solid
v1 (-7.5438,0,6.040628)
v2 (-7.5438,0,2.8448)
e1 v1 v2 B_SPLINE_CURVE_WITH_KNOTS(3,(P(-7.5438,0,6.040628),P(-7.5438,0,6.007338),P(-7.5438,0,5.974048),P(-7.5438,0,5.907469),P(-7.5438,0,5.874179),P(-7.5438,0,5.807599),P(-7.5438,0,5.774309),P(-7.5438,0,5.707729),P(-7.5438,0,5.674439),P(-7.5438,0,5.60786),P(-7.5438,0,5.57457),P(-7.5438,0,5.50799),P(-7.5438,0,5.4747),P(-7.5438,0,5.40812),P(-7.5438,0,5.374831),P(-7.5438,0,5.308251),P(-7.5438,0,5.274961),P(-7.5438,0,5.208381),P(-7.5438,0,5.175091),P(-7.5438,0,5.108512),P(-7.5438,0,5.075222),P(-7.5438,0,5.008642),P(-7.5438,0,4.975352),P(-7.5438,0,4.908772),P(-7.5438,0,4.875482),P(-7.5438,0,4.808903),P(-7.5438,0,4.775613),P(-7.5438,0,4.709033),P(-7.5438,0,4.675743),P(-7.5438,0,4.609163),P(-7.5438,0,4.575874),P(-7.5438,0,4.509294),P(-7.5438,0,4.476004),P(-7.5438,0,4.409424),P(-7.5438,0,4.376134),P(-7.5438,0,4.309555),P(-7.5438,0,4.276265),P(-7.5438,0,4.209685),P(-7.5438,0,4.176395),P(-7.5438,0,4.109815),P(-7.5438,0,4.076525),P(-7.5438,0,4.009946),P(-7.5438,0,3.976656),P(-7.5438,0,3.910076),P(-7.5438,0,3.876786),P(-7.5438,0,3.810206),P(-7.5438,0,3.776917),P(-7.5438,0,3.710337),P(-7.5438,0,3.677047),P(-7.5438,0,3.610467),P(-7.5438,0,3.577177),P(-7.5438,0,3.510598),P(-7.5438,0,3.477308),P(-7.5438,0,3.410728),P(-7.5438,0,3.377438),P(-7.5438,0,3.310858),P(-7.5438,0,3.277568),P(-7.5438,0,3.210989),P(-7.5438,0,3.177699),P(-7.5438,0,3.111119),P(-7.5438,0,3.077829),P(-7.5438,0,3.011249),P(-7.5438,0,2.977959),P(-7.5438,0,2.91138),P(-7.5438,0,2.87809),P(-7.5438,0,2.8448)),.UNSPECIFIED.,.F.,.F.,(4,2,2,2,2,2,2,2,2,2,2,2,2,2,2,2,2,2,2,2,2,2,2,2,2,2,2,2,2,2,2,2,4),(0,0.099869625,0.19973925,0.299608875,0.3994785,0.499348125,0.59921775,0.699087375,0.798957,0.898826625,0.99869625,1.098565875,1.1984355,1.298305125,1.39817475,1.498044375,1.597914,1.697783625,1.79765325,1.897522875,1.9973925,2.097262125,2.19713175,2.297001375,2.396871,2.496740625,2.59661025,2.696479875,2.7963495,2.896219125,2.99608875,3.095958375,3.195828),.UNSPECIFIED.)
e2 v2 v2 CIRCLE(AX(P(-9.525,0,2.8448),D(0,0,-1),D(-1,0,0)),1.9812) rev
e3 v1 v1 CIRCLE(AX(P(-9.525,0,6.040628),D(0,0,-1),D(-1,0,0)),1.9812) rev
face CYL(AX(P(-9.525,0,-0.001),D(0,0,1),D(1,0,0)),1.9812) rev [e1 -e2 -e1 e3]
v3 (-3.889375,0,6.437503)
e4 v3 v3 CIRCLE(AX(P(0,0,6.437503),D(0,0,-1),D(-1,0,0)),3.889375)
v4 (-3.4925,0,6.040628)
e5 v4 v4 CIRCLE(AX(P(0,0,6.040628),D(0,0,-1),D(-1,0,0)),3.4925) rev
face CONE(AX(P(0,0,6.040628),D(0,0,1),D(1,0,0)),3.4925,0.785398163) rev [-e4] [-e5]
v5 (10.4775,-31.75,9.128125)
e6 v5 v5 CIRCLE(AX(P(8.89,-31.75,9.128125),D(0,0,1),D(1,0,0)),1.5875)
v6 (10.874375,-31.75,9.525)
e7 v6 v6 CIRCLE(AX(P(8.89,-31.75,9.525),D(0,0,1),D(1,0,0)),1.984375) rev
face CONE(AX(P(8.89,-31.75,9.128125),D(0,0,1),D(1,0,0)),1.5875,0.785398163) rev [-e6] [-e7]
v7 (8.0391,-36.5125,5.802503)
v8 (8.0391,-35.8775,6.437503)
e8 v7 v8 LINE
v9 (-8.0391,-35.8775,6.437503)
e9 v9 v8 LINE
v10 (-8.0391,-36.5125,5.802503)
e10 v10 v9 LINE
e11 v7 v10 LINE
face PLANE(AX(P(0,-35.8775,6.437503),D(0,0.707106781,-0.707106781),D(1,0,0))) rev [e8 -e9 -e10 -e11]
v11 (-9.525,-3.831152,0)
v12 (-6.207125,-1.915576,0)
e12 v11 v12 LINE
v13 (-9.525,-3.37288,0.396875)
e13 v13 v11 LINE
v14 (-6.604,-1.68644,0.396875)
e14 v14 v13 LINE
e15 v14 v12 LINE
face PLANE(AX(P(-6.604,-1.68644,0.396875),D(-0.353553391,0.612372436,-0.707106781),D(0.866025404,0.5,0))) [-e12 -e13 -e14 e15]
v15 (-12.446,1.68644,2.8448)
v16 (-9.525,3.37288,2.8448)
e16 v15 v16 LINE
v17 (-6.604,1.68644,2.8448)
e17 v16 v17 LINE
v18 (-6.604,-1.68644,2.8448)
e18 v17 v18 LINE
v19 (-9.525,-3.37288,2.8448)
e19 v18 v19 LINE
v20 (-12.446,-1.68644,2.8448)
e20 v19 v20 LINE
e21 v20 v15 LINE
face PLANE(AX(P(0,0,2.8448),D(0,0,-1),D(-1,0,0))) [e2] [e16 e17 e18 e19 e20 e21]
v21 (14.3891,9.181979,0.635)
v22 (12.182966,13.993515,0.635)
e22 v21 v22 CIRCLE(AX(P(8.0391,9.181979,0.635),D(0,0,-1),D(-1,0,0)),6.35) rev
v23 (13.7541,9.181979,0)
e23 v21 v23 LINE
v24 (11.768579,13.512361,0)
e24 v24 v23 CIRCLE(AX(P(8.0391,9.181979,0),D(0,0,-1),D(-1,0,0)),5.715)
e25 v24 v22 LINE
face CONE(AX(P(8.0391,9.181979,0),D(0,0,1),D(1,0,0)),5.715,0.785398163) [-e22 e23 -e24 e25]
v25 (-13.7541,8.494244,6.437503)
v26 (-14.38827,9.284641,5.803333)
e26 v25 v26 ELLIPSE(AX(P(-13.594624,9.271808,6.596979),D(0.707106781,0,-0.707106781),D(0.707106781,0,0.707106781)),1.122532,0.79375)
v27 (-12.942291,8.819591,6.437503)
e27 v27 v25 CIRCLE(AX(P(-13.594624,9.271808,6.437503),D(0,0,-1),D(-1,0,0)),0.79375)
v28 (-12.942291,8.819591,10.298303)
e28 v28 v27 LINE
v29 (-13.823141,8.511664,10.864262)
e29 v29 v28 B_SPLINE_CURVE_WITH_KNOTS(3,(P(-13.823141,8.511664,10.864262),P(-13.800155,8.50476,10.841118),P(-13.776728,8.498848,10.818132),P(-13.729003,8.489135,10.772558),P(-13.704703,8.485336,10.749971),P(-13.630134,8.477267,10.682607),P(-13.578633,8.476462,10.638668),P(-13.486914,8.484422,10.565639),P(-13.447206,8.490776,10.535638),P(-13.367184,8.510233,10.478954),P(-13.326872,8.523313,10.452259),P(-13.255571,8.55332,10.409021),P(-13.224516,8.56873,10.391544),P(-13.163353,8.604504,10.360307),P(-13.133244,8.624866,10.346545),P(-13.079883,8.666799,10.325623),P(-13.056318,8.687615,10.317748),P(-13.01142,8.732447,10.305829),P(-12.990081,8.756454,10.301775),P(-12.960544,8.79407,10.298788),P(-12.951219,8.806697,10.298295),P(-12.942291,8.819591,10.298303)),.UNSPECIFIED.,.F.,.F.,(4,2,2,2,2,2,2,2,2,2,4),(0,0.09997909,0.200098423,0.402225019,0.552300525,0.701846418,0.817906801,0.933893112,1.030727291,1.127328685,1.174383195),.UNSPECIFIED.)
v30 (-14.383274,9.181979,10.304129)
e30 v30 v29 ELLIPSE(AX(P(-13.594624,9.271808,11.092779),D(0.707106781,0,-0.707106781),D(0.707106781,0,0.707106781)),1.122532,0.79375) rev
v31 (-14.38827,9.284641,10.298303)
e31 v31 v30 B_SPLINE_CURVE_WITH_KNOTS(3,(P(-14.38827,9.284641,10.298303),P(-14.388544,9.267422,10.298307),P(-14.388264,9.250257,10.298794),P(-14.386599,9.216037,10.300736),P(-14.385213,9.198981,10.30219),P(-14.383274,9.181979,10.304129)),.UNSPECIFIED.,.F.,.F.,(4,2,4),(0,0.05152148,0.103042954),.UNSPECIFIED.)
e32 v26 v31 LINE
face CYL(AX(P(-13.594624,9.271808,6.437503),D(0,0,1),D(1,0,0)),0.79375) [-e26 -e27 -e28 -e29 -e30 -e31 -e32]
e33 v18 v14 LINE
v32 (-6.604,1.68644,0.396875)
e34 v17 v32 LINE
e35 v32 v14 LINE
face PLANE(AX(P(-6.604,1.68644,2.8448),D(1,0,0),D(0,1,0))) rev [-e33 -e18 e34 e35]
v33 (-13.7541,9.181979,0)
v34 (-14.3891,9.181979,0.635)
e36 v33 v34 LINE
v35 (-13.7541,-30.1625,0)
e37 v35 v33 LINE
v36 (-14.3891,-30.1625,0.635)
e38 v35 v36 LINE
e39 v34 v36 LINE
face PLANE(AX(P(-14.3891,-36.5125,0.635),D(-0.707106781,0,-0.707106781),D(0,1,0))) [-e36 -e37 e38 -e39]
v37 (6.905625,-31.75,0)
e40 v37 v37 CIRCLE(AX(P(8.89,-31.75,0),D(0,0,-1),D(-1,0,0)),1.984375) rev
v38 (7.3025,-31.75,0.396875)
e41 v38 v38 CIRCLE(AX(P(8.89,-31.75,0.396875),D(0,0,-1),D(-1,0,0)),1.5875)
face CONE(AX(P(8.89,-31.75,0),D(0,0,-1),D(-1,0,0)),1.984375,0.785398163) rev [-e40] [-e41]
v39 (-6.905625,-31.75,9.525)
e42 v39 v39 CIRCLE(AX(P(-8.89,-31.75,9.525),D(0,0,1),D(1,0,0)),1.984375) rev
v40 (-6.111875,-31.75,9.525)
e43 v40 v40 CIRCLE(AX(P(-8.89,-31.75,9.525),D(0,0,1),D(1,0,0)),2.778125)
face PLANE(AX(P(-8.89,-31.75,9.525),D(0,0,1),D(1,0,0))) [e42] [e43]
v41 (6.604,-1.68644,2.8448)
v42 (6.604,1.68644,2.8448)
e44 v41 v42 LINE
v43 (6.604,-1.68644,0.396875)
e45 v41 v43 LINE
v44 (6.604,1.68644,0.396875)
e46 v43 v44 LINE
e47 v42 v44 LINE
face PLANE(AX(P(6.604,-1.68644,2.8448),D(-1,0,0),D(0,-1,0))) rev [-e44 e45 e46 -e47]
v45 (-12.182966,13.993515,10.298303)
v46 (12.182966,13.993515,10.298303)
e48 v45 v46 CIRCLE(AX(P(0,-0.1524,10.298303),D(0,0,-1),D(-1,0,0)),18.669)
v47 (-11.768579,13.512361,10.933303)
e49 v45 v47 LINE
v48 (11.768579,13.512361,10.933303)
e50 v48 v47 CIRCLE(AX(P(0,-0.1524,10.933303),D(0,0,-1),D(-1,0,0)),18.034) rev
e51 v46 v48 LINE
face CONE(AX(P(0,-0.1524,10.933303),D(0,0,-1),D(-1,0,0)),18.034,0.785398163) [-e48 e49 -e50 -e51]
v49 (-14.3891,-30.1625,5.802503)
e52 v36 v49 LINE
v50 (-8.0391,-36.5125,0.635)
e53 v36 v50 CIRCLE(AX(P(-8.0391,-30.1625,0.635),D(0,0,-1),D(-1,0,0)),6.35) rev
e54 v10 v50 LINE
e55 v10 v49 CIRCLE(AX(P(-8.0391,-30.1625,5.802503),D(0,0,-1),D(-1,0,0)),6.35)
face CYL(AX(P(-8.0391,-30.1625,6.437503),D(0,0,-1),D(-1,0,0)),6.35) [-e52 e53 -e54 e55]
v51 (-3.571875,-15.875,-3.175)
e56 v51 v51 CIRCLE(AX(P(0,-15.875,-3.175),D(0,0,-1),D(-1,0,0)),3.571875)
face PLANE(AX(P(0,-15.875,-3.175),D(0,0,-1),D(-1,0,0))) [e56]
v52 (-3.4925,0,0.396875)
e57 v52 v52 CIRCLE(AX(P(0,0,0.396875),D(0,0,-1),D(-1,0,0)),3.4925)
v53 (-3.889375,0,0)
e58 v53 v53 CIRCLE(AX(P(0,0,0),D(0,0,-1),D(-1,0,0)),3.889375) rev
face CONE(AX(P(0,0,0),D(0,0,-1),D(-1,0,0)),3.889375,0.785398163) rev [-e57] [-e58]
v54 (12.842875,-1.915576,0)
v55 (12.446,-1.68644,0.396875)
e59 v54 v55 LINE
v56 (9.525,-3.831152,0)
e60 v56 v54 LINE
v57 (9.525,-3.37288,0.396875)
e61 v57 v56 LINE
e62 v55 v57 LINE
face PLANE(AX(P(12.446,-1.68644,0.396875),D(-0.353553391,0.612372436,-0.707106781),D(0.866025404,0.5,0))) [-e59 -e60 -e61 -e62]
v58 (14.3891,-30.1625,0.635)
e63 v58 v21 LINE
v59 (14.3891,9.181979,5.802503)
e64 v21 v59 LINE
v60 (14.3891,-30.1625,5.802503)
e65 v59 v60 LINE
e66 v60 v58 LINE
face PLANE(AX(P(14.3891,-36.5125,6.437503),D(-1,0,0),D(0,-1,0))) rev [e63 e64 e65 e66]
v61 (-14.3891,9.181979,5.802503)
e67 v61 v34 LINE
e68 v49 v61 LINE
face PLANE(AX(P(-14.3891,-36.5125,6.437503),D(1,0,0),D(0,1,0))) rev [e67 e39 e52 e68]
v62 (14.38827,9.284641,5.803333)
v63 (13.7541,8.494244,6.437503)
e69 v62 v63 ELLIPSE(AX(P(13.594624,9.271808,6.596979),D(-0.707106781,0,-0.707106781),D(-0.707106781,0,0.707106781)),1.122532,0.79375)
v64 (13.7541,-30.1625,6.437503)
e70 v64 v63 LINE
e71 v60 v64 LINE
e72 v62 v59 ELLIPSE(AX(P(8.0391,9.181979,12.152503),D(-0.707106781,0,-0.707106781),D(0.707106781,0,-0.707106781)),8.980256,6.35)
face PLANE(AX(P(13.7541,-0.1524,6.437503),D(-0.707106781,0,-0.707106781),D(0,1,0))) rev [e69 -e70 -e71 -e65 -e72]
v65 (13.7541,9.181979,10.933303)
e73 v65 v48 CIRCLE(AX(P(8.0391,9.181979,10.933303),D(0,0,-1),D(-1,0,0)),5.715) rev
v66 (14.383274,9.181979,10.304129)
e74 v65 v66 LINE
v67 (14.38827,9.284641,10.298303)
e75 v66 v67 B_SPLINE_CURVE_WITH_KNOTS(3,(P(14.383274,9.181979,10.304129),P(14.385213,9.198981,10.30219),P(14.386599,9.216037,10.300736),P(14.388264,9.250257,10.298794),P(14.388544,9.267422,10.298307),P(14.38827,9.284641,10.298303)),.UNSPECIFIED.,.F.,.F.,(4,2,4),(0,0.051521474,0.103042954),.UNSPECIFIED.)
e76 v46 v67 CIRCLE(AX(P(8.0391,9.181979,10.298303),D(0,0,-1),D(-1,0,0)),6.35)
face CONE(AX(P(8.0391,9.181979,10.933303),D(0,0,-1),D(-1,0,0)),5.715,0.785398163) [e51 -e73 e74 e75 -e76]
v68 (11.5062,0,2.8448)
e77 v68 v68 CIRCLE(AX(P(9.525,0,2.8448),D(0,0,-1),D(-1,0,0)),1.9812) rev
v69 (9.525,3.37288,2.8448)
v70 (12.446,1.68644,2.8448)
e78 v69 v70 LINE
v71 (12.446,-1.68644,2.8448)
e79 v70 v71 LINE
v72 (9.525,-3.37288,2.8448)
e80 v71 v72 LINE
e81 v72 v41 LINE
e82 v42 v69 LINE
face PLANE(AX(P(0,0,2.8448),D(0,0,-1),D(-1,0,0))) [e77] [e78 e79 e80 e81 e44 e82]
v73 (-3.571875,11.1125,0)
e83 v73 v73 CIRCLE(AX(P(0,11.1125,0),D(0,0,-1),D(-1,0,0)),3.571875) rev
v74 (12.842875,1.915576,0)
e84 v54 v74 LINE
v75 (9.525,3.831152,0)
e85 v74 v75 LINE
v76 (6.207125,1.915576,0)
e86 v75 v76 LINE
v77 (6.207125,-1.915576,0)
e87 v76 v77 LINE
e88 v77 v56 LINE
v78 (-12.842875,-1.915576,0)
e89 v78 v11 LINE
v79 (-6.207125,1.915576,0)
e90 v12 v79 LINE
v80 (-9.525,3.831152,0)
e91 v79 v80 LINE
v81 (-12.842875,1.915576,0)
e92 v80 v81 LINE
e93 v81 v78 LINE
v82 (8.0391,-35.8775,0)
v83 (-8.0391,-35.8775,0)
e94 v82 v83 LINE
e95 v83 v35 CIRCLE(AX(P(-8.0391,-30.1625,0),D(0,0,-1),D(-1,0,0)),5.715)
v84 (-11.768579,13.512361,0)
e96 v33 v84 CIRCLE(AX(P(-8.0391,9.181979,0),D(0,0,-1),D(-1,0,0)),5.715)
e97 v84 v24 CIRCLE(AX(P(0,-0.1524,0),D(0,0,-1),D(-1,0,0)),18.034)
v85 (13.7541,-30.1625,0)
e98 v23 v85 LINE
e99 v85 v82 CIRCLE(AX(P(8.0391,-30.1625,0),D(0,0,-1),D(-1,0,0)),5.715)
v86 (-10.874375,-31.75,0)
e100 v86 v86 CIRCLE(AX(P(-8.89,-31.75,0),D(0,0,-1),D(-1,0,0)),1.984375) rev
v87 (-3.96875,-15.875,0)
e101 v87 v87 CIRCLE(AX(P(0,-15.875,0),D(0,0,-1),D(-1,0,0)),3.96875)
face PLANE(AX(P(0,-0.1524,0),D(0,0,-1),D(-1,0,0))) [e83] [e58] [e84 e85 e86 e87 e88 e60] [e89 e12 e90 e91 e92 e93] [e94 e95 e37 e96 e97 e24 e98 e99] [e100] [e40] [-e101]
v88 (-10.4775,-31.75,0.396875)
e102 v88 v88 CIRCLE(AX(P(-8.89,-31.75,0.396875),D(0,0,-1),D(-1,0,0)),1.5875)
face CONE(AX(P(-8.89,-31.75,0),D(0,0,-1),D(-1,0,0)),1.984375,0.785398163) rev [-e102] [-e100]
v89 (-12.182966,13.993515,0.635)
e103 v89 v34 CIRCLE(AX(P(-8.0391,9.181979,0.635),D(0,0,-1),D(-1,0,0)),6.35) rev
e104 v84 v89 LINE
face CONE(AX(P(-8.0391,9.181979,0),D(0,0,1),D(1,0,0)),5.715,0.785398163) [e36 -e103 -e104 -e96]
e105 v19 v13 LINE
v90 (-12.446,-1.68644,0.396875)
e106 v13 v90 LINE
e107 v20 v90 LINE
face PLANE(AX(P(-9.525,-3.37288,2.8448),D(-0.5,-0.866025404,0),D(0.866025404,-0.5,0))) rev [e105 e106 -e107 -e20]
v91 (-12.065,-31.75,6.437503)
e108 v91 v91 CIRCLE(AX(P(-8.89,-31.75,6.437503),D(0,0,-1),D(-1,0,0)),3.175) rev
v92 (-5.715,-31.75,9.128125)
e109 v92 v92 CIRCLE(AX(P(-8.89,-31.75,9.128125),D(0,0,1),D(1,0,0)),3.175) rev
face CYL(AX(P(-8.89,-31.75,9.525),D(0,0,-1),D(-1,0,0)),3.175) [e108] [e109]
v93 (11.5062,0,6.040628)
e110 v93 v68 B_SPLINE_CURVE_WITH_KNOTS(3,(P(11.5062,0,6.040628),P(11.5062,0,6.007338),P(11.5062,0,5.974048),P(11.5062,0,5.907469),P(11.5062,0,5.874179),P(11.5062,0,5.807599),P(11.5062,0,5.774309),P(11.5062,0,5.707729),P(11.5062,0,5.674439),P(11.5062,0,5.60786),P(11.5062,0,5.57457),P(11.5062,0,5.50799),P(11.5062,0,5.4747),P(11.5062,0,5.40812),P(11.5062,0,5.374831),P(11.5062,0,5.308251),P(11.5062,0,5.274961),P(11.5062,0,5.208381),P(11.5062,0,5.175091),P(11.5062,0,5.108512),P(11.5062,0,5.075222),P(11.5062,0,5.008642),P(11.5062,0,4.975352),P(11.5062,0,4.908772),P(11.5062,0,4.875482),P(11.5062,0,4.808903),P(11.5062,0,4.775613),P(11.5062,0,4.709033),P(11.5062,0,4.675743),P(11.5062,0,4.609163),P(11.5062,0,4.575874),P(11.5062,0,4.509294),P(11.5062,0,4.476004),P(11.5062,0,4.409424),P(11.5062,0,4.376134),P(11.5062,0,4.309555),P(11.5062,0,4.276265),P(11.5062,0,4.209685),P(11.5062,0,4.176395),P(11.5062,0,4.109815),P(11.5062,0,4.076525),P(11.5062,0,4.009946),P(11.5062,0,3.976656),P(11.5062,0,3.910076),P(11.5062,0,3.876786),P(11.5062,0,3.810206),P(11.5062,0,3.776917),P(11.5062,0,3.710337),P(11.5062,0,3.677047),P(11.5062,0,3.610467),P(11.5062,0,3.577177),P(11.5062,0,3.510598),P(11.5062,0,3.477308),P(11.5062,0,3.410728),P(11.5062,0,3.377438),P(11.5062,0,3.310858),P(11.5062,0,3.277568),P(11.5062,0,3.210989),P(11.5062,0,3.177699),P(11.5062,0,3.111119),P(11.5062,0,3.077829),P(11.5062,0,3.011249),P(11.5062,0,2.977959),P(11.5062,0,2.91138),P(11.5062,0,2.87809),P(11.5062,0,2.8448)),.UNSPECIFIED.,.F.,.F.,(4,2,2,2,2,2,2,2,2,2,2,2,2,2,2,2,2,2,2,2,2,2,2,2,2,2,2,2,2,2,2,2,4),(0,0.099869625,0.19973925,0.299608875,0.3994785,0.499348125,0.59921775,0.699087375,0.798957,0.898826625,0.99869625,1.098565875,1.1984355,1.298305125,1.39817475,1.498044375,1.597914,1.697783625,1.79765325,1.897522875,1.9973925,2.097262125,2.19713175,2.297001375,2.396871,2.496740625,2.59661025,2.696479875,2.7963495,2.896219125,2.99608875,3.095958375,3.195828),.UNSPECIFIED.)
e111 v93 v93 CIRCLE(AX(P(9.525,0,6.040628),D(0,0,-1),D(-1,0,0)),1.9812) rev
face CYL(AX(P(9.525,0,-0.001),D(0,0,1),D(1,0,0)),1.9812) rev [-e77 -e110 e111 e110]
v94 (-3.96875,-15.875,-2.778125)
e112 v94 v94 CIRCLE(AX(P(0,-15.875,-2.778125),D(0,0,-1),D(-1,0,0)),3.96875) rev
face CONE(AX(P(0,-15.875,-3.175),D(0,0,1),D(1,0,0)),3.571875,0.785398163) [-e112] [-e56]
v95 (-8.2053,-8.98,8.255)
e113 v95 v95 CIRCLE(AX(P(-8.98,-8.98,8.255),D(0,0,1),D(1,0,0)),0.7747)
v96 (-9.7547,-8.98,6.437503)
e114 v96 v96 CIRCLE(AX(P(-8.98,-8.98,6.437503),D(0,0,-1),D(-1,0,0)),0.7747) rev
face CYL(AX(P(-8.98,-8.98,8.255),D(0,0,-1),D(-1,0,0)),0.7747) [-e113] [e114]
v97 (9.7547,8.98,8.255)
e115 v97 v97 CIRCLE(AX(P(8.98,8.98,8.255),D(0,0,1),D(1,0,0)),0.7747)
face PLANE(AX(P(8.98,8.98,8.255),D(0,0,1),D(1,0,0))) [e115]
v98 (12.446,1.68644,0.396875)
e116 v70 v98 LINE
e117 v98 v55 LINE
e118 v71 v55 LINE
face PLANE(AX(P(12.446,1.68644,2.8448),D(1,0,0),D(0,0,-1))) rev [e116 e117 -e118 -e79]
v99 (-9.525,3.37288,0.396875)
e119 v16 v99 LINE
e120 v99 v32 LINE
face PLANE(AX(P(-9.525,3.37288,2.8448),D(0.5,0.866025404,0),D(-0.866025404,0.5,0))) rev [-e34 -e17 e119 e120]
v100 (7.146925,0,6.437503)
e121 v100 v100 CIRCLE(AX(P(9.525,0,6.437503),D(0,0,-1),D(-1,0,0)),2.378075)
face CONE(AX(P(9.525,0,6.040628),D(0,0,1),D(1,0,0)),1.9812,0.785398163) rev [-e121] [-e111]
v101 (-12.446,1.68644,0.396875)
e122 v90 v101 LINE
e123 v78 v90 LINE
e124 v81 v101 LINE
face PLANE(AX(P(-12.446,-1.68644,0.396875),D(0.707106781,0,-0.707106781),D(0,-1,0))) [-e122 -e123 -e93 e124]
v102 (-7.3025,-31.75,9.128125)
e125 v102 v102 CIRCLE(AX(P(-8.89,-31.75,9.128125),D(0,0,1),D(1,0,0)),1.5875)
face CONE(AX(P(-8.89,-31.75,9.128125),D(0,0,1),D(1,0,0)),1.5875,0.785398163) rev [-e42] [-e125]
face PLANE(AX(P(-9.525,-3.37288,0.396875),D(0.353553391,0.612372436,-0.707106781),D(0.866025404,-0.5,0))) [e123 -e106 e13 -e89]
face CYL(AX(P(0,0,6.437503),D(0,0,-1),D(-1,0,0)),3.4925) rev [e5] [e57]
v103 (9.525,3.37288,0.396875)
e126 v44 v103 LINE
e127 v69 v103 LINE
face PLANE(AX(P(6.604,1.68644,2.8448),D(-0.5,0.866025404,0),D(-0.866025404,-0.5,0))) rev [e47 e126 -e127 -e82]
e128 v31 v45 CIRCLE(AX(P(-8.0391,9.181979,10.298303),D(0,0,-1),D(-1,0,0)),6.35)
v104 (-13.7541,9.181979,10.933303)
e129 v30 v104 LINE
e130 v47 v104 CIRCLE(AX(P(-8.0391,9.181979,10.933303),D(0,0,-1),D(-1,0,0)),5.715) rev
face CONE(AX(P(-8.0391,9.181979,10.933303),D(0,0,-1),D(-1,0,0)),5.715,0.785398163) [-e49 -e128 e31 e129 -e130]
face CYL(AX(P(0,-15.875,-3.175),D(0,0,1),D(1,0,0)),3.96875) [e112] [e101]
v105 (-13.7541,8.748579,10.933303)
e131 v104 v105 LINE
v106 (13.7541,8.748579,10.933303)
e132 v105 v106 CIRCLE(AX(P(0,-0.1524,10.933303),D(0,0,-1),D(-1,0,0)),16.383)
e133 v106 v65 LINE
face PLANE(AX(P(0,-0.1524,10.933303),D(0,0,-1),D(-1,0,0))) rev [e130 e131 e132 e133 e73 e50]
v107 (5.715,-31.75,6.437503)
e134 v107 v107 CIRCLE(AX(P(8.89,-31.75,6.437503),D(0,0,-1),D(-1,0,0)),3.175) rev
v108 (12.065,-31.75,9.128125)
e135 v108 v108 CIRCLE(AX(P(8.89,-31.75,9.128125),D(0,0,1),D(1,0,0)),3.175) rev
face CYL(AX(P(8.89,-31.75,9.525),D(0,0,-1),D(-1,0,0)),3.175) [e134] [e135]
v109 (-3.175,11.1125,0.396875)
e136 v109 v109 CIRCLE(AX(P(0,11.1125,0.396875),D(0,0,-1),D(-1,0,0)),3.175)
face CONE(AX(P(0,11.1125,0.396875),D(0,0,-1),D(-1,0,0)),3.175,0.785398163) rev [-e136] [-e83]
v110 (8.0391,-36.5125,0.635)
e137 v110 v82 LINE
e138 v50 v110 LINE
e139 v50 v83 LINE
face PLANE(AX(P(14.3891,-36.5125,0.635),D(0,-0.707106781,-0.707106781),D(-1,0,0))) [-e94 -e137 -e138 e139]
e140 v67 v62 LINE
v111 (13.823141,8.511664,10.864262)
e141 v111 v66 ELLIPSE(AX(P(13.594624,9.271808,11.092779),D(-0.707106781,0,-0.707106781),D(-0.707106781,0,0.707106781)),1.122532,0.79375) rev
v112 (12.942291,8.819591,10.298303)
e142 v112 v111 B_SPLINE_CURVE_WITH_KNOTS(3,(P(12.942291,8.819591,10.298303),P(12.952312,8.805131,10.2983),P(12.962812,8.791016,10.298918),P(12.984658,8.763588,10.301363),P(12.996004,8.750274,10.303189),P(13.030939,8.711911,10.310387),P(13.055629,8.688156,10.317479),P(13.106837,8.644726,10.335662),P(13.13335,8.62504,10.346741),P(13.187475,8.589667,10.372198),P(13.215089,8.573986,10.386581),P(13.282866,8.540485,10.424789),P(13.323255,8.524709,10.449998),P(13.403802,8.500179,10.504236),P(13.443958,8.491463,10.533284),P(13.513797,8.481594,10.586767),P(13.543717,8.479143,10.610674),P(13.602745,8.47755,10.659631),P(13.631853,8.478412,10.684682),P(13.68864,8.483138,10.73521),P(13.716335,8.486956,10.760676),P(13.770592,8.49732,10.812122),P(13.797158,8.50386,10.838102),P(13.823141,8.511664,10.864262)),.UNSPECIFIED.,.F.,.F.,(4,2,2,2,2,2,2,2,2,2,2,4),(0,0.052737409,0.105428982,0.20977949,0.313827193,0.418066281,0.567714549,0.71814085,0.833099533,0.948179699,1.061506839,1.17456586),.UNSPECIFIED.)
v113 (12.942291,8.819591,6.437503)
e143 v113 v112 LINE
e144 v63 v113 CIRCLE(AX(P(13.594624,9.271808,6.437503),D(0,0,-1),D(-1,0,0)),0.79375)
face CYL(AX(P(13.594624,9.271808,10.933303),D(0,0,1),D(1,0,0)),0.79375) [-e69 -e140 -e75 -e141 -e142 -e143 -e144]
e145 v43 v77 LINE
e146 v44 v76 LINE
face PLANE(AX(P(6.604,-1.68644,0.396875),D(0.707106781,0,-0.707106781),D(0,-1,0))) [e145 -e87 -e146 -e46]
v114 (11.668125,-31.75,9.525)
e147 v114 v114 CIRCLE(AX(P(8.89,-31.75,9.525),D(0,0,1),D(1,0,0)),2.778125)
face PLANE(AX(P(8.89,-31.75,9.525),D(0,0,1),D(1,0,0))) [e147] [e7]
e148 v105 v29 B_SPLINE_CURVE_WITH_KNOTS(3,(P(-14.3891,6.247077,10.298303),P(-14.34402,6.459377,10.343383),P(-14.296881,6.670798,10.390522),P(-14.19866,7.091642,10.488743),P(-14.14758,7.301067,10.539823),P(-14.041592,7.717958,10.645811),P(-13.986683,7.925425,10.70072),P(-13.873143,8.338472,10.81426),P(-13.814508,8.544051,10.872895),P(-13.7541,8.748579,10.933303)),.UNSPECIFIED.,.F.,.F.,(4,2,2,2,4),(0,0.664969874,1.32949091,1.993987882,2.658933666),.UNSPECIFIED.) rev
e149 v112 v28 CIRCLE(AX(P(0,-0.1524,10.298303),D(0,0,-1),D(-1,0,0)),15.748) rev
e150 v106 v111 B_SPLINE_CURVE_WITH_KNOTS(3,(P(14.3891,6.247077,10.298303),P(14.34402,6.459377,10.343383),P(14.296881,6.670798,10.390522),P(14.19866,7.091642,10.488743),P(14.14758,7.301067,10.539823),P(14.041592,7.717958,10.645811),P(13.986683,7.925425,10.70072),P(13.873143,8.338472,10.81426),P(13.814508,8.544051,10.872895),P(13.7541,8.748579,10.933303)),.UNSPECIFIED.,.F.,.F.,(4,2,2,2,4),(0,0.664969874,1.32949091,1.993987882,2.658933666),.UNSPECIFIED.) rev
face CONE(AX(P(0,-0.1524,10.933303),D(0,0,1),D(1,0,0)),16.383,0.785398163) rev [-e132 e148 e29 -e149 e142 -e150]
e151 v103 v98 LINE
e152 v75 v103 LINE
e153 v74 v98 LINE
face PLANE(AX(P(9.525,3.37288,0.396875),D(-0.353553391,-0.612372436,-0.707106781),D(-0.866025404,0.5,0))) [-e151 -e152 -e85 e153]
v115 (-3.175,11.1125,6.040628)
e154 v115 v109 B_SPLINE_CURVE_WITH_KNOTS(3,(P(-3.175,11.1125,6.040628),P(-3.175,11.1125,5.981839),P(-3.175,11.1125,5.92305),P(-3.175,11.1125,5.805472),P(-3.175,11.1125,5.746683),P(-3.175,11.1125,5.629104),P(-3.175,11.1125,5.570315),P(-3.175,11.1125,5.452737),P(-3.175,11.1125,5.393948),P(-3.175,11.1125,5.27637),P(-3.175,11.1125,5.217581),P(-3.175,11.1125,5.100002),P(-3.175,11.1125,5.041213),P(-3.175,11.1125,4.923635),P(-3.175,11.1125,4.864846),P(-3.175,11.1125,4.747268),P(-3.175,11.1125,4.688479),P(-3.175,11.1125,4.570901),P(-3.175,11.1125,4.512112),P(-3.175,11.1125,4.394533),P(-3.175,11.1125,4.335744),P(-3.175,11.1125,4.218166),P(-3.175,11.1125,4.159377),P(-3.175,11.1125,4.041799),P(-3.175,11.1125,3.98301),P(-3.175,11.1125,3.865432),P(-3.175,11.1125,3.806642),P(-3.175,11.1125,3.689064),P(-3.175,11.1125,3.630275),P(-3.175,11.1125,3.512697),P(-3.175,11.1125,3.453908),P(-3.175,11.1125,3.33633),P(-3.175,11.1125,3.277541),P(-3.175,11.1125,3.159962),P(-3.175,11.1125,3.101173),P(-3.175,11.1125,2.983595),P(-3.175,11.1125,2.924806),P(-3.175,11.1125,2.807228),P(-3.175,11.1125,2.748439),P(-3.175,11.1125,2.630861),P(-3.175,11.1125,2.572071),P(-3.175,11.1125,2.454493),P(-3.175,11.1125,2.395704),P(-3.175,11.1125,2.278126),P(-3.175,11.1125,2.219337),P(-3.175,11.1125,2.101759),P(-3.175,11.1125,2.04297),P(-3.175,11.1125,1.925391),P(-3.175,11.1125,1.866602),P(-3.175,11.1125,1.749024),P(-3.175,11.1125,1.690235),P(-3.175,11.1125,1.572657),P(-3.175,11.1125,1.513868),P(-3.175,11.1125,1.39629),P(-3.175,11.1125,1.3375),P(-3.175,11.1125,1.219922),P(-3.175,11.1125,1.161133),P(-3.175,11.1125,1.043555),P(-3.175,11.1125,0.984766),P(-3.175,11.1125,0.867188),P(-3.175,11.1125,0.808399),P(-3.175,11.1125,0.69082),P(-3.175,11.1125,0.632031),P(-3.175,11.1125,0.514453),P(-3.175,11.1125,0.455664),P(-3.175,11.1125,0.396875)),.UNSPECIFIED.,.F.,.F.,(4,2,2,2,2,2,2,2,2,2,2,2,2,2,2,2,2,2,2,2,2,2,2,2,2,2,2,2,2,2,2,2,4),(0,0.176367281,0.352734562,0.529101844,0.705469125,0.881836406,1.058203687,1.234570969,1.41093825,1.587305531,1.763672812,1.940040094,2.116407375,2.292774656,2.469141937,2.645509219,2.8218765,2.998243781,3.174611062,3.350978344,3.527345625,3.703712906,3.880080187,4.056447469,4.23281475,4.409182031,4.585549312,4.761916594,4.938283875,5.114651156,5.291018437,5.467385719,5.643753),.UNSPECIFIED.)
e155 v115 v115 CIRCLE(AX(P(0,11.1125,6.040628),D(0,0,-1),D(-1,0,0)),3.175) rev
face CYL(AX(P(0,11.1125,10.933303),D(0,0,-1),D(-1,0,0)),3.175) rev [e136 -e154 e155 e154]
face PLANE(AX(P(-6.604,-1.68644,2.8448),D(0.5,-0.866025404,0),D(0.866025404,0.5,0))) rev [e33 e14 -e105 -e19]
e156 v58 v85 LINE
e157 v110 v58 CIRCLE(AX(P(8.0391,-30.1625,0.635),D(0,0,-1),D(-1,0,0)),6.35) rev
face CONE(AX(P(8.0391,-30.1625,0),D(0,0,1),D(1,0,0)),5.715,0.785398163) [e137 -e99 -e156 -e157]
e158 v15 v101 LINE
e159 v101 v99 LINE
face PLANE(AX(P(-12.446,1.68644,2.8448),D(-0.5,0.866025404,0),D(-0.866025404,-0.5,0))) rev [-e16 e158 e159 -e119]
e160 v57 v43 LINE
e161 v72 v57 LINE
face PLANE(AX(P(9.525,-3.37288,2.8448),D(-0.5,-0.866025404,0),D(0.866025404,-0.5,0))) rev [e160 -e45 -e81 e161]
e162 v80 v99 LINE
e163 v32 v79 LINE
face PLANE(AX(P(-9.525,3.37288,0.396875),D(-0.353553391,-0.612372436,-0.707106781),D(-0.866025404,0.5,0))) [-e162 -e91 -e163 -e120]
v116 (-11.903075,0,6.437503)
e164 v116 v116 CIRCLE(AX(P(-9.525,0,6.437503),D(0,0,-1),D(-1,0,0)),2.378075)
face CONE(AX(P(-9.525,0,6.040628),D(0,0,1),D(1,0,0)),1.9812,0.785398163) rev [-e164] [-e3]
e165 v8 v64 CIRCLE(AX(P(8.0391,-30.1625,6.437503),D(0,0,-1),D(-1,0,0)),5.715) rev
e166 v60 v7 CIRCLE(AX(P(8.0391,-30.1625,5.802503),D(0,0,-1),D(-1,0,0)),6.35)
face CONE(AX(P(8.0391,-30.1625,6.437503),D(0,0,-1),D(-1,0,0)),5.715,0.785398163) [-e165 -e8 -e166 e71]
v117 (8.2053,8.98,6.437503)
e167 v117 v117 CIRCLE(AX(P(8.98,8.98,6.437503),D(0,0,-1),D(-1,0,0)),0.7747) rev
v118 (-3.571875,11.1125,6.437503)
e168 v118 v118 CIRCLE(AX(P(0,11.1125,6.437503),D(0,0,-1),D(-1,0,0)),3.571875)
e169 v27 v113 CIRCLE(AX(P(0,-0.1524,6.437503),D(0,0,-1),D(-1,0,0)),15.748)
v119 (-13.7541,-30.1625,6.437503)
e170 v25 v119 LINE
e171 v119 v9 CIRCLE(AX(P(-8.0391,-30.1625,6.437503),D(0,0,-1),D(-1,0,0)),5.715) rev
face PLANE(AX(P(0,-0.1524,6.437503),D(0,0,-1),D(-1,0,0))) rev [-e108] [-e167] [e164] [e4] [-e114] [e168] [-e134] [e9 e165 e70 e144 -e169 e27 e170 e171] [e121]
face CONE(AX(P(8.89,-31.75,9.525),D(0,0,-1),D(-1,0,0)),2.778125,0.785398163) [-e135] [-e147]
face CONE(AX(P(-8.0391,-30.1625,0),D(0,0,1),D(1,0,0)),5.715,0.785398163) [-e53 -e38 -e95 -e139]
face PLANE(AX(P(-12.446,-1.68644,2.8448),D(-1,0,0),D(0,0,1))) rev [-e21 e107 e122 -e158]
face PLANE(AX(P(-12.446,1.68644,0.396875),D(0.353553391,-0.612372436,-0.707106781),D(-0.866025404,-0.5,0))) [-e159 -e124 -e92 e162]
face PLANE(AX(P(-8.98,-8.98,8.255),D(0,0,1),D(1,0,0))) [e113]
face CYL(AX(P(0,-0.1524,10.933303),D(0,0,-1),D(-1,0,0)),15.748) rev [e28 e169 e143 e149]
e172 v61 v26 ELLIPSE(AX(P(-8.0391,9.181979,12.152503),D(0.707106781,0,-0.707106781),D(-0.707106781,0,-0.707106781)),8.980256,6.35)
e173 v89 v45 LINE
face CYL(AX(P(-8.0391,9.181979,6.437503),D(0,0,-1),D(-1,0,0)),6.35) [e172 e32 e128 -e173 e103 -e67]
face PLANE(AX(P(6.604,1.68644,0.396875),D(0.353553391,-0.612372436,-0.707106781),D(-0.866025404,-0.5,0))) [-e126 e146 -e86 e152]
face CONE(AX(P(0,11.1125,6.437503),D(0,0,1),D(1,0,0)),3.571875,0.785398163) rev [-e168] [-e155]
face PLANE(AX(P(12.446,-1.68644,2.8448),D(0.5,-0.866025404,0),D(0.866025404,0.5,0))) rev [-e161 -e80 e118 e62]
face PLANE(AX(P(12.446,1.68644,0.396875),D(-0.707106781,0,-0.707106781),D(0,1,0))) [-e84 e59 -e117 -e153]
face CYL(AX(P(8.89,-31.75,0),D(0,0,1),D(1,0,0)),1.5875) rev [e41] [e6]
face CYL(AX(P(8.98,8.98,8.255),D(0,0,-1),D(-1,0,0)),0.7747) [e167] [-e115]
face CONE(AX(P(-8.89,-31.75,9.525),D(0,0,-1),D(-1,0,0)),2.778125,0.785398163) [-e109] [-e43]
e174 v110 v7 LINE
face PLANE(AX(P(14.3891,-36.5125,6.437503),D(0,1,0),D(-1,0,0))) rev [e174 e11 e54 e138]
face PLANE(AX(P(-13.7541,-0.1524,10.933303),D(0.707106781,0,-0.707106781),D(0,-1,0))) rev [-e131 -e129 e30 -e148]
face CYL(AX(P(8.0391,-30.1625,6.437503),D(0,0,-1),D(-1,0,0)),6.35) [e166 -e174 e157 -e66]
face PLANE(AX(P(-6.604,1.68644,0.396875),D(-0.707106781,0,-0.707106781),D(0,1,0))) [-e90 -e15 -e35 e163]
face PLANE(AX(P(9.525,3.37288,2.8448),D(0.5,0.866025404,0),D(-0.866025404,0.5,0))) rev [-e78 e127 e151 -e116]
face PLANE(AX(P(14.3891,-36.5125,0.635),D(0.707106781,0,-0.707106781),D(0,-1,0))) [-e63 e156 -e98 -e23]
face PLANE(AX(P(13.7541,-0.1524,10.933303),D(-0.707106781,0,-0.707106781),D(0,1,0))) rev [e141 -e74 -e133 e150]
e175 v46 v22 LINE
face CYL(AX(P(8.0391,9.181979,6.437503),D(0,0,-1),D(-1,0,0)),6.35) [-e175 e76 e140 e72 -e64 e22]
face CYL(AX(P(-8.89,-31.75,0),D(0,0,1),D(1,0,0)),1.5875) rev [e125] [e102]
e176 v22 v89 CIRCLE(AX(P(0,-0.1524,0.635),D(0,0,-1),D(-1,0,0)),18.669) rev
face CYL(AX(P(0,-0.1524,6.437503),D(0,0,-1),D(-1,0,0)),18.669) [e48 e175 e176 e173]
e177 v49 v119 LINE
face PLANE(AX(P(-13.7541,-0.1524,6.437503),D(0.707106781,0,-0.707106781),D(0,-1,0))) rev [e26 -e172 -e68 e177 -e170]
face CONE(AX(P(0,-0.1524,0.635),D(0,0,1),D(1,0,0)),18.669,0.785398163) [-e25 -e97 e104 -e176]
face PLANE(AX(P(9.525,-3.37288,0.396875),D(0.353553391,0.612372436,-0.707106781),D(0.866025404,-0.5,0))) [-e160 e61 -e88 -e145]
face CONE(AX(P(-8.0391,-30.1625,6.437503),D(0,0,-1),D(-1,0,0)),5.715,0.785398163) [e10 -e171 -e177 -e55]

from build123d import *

# Parameters (mm, degrees)
SKETCH2_R           = 3.4925
BOSS_EXTRUDE1_DEPTH = 6.437503
BOSS_EXTRUDE5_DEPTH = 4.4958
CUT_EXTRUDE7_REACH  = 41.77
SKETCH17_R          = 1.9812
SKETCH13_R          = 1.5875
CUT_EXTRUDE5_DEPTH  = 40.769967311
SKETCH7_R           = 3.96875
BOSS_EXTRUDE4_DEPTH = 3.175
SKETCH14_R          = 3.175
CUT_EXTRUDE6_DEPTH  = 41.73997999
BOSS_EXTRUDE7_START = 3.087497
SKETCH15_R          = 3.175
SKETCH15_R_2        = 1.5875
BOSS_EXTRUDE7_DEPTH = 3.087497
SKETCH16_R          = 0.7747
BOSS_EXTRUDE8_DEPTH = 8.255
CUT_EXTRUDE8_DEPTH  = 2.8448
CHAMFER1_SIZE       = 0.396875
FILLET1_R           = 6.35
CHAMFER2_SIZE       = 0.635
FILLET2_R           = 0.79375


with BuildPart() as part:
    # Sketch2 → Boss-Extrude1 (new body)
    with BuildSketch(Plane.XY):
        with BuildLine():
            Line((14.3891, -36.5125), (-14.3891, -36.5125))
            Line((-14.3891, -36.5125), (-14.3891, 11.742361964))
            ThreePointArc((-14.3891, 11.742361964), (0, 18.5166), (14.3891, 11.742361964))
            Line((14.3891, 11.742361964), (14.3891, -36.5125))
        make_face()
        Circle(SKETCH2_R, mode=Mode.SUBTRACT)
    extrude(amount=BOSS_EXTRUDE1_DEPTH)

    # Sketch12 → Boss-Extrude5 (add)
    with BuildSketch(Plane.XY.offset(6.437503)):
        with BuildLine():
            Line((-14.3891, 6.247076947), (-14.3891, 11.742361964))
            ThreePointArc((-14.3891, 11.742361964), (0, 18.5166), (14.3891, 11.742361964))
            Line((14.3891, 11.742361964), (14.3891, 6.247076947))
            ThreePointArc((14.3891, 6.247076947), (0, 15.5956), (-14.3891, 6.247076947))
        make_face()
    extrude(amount=BOSS_EXTRUDE5_DEPTH)

    # Sketch17 → Cut-Extrude7 (cut, up to next)
    with BuildSketch(Plane.XY.offset(6.437503), mode=Mode.PRIVATE) as cut_extrude7_sk1:
        with Locations((-9.525, 0)):
            Circle(SKETCH17_R)
    cut_extrude7_tool1 = extrude(cut_extrude7_sk1.sketch, amount=-CUT_EXTRUDE7_REACH, mode=Mode.PRIVATE) & part.part
    # Sketch17 → Cut-Extrude7 (cut, up to next)
    with BuildSketch(Plane.XY.offset(6.437503), mode=Mode.PRIVATE) as cut_extrude7_sk2:
        with Locations((9.525, 0)):
            Circle(SKETCH17_R)
    cut_extrude7_tool2 = extrude(cut_extrude7_sk2.sketch, amount=-CUT_EXTRUDE7_REACH, mode=Mode.PRIVATE) & part.part
    add(cut_extrude7_tool1.solids().sort_by_distance((-9.525, 0, 6.437503))[0], mode=Mode.SUBTRACT)
    add(cut_extrude7_tool2.solids().sort_by_distance((9.525, 0, 6.437503))[0], mode=Mode.SUBTRACT)

    # Sketch13 → Cut-Extrude5 (cut, through all)
    with BuildSketch(Plane.XY.offset(6.437503)):
        with Locations((8.89, -31.75)):
            Circle(SKETCH13_R)
        with Locations((-8.89, -31.75)):
            Circle(SKETCH13_R)
    extrude(amount=-CUT_EXTRUDE5_DEPTH, mode=Mode.SUBTRACT)

    # Sketch7 → Boss-Extrude4 (add)
    with BuildSketch(Plane(origin=(0, 0, 0), x_dir=(-1, 0, 0), z_dir=(0, 0, -1))):
        with Locations((0, -15.875)):
            Circle(SKETCH7_R)
    extrude(amount=BOSS_EXTRUDE4_DEPTH)

    # Sketch14 → Cut-Extrude6 (cut, through all)
    with BuildSketch(Plane(origin=(0, 0, 0), x_dir=(-1, 0, 0), z_dir=(0, 0, -1))):
        with Locations((0, 11.1125)):
            Circle(SKETCH14_R)
    extrude(amount=-CUT_EXTRUDE6_DEPTH, mode=Mode.SUBTRACT)

    # Sketch15 → Boss-Extrude7 (add)
    # profile 1 of 2: a face of its own
    with BuildSketch(Plane.XY.offset(6.437503).offset(BOSS_EXTRUDE7_START)):
        with Locations(Location((-8.89, -31.75, 0), (0, 0, 180))):
            Circle(SKETCH15_R)
        with Locations((-8.89, -31.75)):
            Circle(SKETCH15_R_2, mode=Mode.SUBTRACT)
    # profile 2 of 2: a face of its own
    with BuildSketch(Plane.XY.offset(6.437503).offset(BOSS_EXTRUDE7_START)):
        with Locations(Location((8.89, -31.75, 0), (0, 0, 180))):
            Circle(SKETCH15_R)
        with Locations((8.89, -31.75)):
            Circle(SKETCH15_R_2, mode=Mode.SUBTRACT)
    extrude(amount=-BOSS_EXTRUDE7_DEPTH)

    # Sketch16 → Boss-Extrude8 (add)
    with BuildSketch(Plane.XY):
        with Locations(Location((8.979999998, 8.979999998, 0), (0, 0, 180))):
            Circle(SKETCH16_R)
        with Locations(Location((-8.980000074, -8.980000074, 0), (0, 0, 180))):
            Circle(SKETCH16_R)
    extrude(amount=BOSS_EXTRUDE8_DEPTH)

    # Sketch11 → Cut-Extrude8 (cut)
    with BuildSketch(Plane(origin=(0, 0, 0), x_dir=(-1, 0, 0), z_dir=(0, 0, -1))):
        Polygon((9.525, -3.372880273), (12.446, -1.686440136), (12.446, 1.686440136), (9.525, 3.372880273), (6.604, 1.686440136), (6.604, -1.686440136), align=None)
        Polygon((-6.604, -1.686440136), (-6.604, 1.686440136), (-9.525, 3.372880273), (-12.446, 1.686440136), (-12.446, -1.686440136), (-9.525, -3.372880273), align=None)
    extrude(amount=-CUT_EXTRUDE8_DEPTH, mode=Mode.SUBTRACT)

    # Chamfer1
    chamfer1_edges = [part.edges().sort_by_distance(p)[0] for p in [
        (8.0645, -2.529660204, 0),
        (6.604, 0, 0),
        (8.0645, 2.529660204, 0),
        (10.9855, 2.529660204, 0),
        (12.446, 0, 0),
        (10.9855, -2.529660204, 0),
        (-3.4925, 0, 0),
        (-3.4925, 0, 6.437503),
        (-11.5062, 0, 6.437503),
        (7.5438, 0, 6.437503),
        (7.3025, -31.75, 0),
        (-10.4775, -31.75, 0),
        (3.96875, -15.875, -3.175),
        (3.175, 11.1125, 6.437503),
        (3.175, 11.1125, 0),
        (-5.715, -31.75, 9.525),
        (-10.4775, -31.75, 9.525),
        (12.065, -31.75, 9.525),
        (7.3025, -31.75, 9.525),
        (-8.0645, -2.529660204, 0),
        (-10.9855, -2.529660204, 0),
        (-12.446, 0, 0),
        (-10.9855, 2.529660204, 0),
        (-8.0645, 2.529660204, 0),
        (-6.604, 0, 0),
    ]]
    chamfer(chamfer1_edges, length=CHAMFER1_SIZE)

    # Fillet1
    fillet1_edges = [part.edges().sort_by_distance(p)[0] for p in [
        (14.3891, -36.5125, 3.2187515),
        (-14.3891, -36.5125, 3.2187515),
        (-14.3891, 11.742361964, 5.4666515),
        (14.3891, 11.742361964, 5.4666515),
    ]]
    fillet(fillet1_edges, radius=FILLET1_R)

    # Chamfer2
    chamfer2_edges = [part.edges().sort_by_distance(p)[0] for p in [
        (-14.3891, -11.957711527, 6.437503),
        (14.3891, -10.490260477, 0),
        (14.3891, -11.957711527, 6.437503),
        (0, -36.5125, 0),
        (-14.3891, -10.490260477, 0),
        (0, 18.5166, 0),
        (0, 15.5956, 10.933303),
        (13.811276754, 11.828576016, 0),
        (-13.811276754, 11.828576016, 0),
        (-12.529228061, -34.652628061, 0),
        (12.529228061, -34.652628061, 0),
        (0, -36.5125, 6.437503),
        (14.3891, 7.714527997, 10.933303),
        (-12.529228061, -34.652628061, 6.437503),
        (12.529228061, -34.652628061, 6.437503),
        (-14.3891, 7.714527997, 10.933303),
        (0, 18.5166, 10.933303),
        (13.811276754, 11.828576016, 10.933303),
        (-13.811276754, 11.828576016, 10.933303),
    ]]
    chamfer(chamfer2_edges, length=CHAMFER2_SIZE)

    # Fillet2
    # the kernel refuses this fillet: 0.79375 mm, written as the material it takes off along each edge
    with BuildSketch(Plane(origin=(-14.3891, 6.247076947, 17.892212695), x_dir=(0.0002732221102440435, 0.9999999626748386, 0), z_dir=(0, 0, -1))) as fillet2_piece_1_section:
        with BuildLine():
            CenterArc((3.024948012, 0.793649735), FILLET2_R, 124.715226163, 146.195471544)
            Line((2.572908986, 1.446106463), (2.527705084, 1.511352136))
            ThreePointArc((2.527705084, 1.511352136), (1.281516556, 0.731838796), (-0.032235611, 0.072534516))
            Line((-0.032235611, 0.072534516), (-2.1687e-05, -0.079374997))
            ThreePointArc((-2.1687e-05, -0.079374997), (2.934880304, -0.080176877), (3.038825464, -0.079364974))
            Line((3.038825464, -0.079364974), (3.037563878, 0))
        make_face()
    fillet2_piece_1 = extrude(amount=19.683619389, mode=Mode.PRIVATE)
    fillet2_piece_1 = split(fillet2_piece_1, bisect_by=Plane(origin=(-14.022158443, 7.803224896, 6.437503), z_dir=(0, 0, 1)), keep=Keep.TOP, mode=Mode.PRIVATE)
    fillet2_piece_1 = split(fillet2_piece_1, bisect_by=Plane(origin=(-11.009501919, 7.803224896, 9.182101081), z_dir=(-0.7071067811865476, 0, 0.7071067811865476)), keep=Keep.TOP, mode=Mode.PRIVATE)
    add(fillet2_piece_1, mode=Mode.SUBTRACT)
    with BuildSketch(Plane(origin=(-14.3891, 6.247076947, 17.892212695), x_dir=(0.0002732221102440435, 0.9999999626748386, 0), z_dir=(0, 0, -1))) as fillet2_piece_2_section:
        with BuildLine():
            CenterArc((3.024948012, 0.793649735), FILLET2_R, 124.715226163, 146.195471544)
            Line((2.572908986, 1.446106463), (2.527705084, 1.511352136))
            ThreePointArc((2.527705084, 1.511352136), (1.281516556, 0.731838796), (-0.032235611, 0.072534516))
            Line((-0.032235611, 0.072534516), (-2.1687e-05, -0.079374997))
            ThreePointArc((-2.1687e-05, -0.079374997), (2.934880304, -0.080176877), (3.038825464, -0.079364974))
            Line((3.038825464, -0.079364974), (3.037563878, 0))
        make_face()
    fillet2_piece_2 = extrude(amount=19.683619389, mode=Mode.PRIVATE)
    fillet2_piece_2 = split(fillet2_piece_2, bisect_by=Plane(origin=(-13.314712844, 8.331467519, 6.437503), z_dir=(0, 0, 1)), keep=Keep.TOP, mode=Mode.PRIVATE)
    fillet2_piece_2 = split(fillet2_piece_2, bisect_by=Plane(origin=(-13.424559633, 8.331467519, 6.767043367), z_dir=(0.7071067811865476, 0, -0.7071067811865476)), keep=Keep.TOP, mode=Mode.PRIVATE)
    add(fillet2_piece_2, mode=Mode.SUBTRACT)
    with BuildSketch(Plane(origin=(-14.3891, 6.247076947, 17.892212695), x_dir=(0.0002732221102440435, 0.9999999626748386, 0), z_dir=(0, 0, -1))) as fillet2_piece_3_section:
        with BuildLine():
            CenterArc((3.024948012, 0.793649735), FILLET2_R, 124.715226163, 146.195471544)
            Line((2.572908986, 1.446106463), (2.527705084, 1.511352136))
            ThreePointArc((2.527705084, 1.511352136), (1.281516556, 0.731838796), (-0.032235611, 0.072534516))
            Line((-0.032235611, 0.072534516), (-2.1687e-05, -0.079374997))
            ThreePointArc((-2.1687e-05, -0.079374997), (2.934880304, -0.080176877), (3.038825464, -0.079364974))
            Line((3.038825464, -0.079364974), (3.037563878, 0))
        make_face()
    fillet2_piece_3 = extrude(amount=19.683619389, mode=Mode.PRIVATE)
    fillet2_piece_3 = split(fillet2_piece_3, bisect_by=Plane(origin=(-14.26899261, 7.67744115, 6.437503), z_dir=(0, 0, -1)), keep=Keep.TOP, mode=Mode.PRIVATE)
    fillet2_piece_3 = split(fillet2_piece_3, bisect_by=Plane(origin=(-14.140269457, 7.67744115, 6.051333543), z_dir=(-0.7071067811865476, 0, 0.7071067811865476)), keep=Keep.TOP, mode=Mode.PRIVATE)
    add(fillet2_piece_3, mode=Mode.SUBTRACT)
    with BuildSketch(Plane(origin=(14.3891, 6.247076947, -1.791406695), x_dir=(-0.0002732221102440462, 0.9999999626748386, 5.927476528362276e-15), z_dir=(0, 0, 1))) as fillet2_piece_4_section:
        with BuildLine():
            CenterArc((3.024948012, 0.793649735), FILLET2_R, 124.715226163, 146.195471544)
            Line((2.572908986, 1.446106463), (2.527705084, 1.511352136))
            ThreePointArc((2.527705084, 1.511352136), (1.281516556, 0.731838796), (-0.032235611, 0.072534516))
            Line((-0.032235611, 0.072534516), (-2.1687e-05, -0.079374997))
            ThreePointArc((-2.1687e-05, -0.079374997), (2.934880304, -0.080176877), (3.038825464, -0.079364974))
            Line((3.038825464, -0.079364974), (3.037563878, 0))
        make_face()
    fillet2_piece_4 = extrude(amount=19.683619389, mode=Mode.PRIVATE)
    fillet2_piece_4 = split(fillet2_piece_4, bisect_by=Plane(origin=(13.314712844, 8.331467519, 6.437503), z_dir=(0, 0, 1)), keep=Keep.TOP, mode=Mode.PRIVATE)
    fillet2_piece_4 = split(fillet2_piece_4, bisect_by=Plane(origin=(13.424559633, 8.331467519, 6.767043367), z_dir=(-0.7071067811865476, 0, -0.7071067811865476)), keep=Keep.TOP, mode=Mode.PRIVATE)
    add(fillet2_piece_4, mode=Mode.SUBTRACT)
    with BuildSketch(Plane(origin=(14.3891, 6.247076947, -1.791406695), x_dir=(-0.0002732221102440462, 0.9999999626748386, 5.927476528362276e-15), z_dir=(0, 0, 1))) as fillet2_piece_5_section:
        with BuildLine():
            CenterArc((3.024948012, 0.793649735), FILLET2_R, 124.715226163, 146.195471544)
            Line((2.572908986, 1.446106463), (2.527705084, 1.511352136))
            ThreePointArc((2.527705084, 1.511352136), (1.281516556, 0.731838796), (-0.032235611, 0.072534516))
            Line((-0.032235611, 0.072534516), (-2.1687e-05, -0.079374997))
            ThreePointArc((-2.1687e-05, -0.079374997), (2.934880304, -0.080176877), (3.038825464, -0.079364974))
            Line((3.038825464, -0.079364974), (3.037563878, 0))
        make_face()
    fillet2_piece_5 = extrude(amount=19.683619389, mode=Mode.PRIVATE)
    fillet2_piece_5 = split(fillet2_piece_5, bisect_by=Plane(origin=(14.26899261, 7.67744115, 6.437503), z_dir=(0, 0, -1)), keep=Keep.TOP, mode=Mode.PRIVATE)
    fillet2_piece_5 = split(fillet2_piece_5, bisect_by=Plane(origin=(14.140269457, 7.67744115, 6.051333543), z_dir=(0.7071067811865476, 0, 0.7071067811865476)), keep=Keep.TOP, mode=Mode.PRIVATE)
    add(fillet2_piece_5, mode=Mode.SUBTRACT)
    with BuildSketch(Plane(origin=(14.3891, 6.247076947, -1.791406695), x_dir=(-0.0002732221102440462, 0.9999999626748386, 5.927476528362276e-15), z_dir=(0, 0, 1))) as fillet2_piece_6_section:
        with BuildLine():
            CenterArc((3.024948012, 0.793649735), FILLET2_R, 124.715226163, 146.195471544)
            Line((2.572908986, 1.446106463), (2.527705084, 1.511352136))
            ThreePointArc((2.527705084, 1.511352136), (1.281516556, 0.731838796), (-0.032235611, 0.072534516))
            Line((-0.032235611, 0.072534516), (-2.1687e-05, -0.079374997))
            ThreePointArc((-2.1687e-05, -0.079374997), (2.934880304, -0.080176877), (3.038825464, -0.079364974))
            Line((3.038825464, -0.079364974), (3.037563878, 0))
        make_face()
    fillet2_piece_6 = extrude(amount=19.683619389, mode=Mode.PRIVATE)
    fillet2_piece_6 = split(fillet2_piece_6, bisect_by=Plane(origin=(14.022158443, 7.803224896, 6.437503), z_dir=(0, 0, 1)), keep=Keep.TOP, mode=Mode.PRIVATE)
    fillet2_piece_6 = split(fillet2_piece_6, bisect_by=Plane(origin=(11.009501919, 7.803224896, 9.182101081), z_dir=(0.7071067811865476, 0, 0.7071067811865476)), keep=Keep.TOP, mode=Mode.PRIVATE)
    add(fillet2_piece_6, mode=Mode.SUBTRACT)


solid = part.part
